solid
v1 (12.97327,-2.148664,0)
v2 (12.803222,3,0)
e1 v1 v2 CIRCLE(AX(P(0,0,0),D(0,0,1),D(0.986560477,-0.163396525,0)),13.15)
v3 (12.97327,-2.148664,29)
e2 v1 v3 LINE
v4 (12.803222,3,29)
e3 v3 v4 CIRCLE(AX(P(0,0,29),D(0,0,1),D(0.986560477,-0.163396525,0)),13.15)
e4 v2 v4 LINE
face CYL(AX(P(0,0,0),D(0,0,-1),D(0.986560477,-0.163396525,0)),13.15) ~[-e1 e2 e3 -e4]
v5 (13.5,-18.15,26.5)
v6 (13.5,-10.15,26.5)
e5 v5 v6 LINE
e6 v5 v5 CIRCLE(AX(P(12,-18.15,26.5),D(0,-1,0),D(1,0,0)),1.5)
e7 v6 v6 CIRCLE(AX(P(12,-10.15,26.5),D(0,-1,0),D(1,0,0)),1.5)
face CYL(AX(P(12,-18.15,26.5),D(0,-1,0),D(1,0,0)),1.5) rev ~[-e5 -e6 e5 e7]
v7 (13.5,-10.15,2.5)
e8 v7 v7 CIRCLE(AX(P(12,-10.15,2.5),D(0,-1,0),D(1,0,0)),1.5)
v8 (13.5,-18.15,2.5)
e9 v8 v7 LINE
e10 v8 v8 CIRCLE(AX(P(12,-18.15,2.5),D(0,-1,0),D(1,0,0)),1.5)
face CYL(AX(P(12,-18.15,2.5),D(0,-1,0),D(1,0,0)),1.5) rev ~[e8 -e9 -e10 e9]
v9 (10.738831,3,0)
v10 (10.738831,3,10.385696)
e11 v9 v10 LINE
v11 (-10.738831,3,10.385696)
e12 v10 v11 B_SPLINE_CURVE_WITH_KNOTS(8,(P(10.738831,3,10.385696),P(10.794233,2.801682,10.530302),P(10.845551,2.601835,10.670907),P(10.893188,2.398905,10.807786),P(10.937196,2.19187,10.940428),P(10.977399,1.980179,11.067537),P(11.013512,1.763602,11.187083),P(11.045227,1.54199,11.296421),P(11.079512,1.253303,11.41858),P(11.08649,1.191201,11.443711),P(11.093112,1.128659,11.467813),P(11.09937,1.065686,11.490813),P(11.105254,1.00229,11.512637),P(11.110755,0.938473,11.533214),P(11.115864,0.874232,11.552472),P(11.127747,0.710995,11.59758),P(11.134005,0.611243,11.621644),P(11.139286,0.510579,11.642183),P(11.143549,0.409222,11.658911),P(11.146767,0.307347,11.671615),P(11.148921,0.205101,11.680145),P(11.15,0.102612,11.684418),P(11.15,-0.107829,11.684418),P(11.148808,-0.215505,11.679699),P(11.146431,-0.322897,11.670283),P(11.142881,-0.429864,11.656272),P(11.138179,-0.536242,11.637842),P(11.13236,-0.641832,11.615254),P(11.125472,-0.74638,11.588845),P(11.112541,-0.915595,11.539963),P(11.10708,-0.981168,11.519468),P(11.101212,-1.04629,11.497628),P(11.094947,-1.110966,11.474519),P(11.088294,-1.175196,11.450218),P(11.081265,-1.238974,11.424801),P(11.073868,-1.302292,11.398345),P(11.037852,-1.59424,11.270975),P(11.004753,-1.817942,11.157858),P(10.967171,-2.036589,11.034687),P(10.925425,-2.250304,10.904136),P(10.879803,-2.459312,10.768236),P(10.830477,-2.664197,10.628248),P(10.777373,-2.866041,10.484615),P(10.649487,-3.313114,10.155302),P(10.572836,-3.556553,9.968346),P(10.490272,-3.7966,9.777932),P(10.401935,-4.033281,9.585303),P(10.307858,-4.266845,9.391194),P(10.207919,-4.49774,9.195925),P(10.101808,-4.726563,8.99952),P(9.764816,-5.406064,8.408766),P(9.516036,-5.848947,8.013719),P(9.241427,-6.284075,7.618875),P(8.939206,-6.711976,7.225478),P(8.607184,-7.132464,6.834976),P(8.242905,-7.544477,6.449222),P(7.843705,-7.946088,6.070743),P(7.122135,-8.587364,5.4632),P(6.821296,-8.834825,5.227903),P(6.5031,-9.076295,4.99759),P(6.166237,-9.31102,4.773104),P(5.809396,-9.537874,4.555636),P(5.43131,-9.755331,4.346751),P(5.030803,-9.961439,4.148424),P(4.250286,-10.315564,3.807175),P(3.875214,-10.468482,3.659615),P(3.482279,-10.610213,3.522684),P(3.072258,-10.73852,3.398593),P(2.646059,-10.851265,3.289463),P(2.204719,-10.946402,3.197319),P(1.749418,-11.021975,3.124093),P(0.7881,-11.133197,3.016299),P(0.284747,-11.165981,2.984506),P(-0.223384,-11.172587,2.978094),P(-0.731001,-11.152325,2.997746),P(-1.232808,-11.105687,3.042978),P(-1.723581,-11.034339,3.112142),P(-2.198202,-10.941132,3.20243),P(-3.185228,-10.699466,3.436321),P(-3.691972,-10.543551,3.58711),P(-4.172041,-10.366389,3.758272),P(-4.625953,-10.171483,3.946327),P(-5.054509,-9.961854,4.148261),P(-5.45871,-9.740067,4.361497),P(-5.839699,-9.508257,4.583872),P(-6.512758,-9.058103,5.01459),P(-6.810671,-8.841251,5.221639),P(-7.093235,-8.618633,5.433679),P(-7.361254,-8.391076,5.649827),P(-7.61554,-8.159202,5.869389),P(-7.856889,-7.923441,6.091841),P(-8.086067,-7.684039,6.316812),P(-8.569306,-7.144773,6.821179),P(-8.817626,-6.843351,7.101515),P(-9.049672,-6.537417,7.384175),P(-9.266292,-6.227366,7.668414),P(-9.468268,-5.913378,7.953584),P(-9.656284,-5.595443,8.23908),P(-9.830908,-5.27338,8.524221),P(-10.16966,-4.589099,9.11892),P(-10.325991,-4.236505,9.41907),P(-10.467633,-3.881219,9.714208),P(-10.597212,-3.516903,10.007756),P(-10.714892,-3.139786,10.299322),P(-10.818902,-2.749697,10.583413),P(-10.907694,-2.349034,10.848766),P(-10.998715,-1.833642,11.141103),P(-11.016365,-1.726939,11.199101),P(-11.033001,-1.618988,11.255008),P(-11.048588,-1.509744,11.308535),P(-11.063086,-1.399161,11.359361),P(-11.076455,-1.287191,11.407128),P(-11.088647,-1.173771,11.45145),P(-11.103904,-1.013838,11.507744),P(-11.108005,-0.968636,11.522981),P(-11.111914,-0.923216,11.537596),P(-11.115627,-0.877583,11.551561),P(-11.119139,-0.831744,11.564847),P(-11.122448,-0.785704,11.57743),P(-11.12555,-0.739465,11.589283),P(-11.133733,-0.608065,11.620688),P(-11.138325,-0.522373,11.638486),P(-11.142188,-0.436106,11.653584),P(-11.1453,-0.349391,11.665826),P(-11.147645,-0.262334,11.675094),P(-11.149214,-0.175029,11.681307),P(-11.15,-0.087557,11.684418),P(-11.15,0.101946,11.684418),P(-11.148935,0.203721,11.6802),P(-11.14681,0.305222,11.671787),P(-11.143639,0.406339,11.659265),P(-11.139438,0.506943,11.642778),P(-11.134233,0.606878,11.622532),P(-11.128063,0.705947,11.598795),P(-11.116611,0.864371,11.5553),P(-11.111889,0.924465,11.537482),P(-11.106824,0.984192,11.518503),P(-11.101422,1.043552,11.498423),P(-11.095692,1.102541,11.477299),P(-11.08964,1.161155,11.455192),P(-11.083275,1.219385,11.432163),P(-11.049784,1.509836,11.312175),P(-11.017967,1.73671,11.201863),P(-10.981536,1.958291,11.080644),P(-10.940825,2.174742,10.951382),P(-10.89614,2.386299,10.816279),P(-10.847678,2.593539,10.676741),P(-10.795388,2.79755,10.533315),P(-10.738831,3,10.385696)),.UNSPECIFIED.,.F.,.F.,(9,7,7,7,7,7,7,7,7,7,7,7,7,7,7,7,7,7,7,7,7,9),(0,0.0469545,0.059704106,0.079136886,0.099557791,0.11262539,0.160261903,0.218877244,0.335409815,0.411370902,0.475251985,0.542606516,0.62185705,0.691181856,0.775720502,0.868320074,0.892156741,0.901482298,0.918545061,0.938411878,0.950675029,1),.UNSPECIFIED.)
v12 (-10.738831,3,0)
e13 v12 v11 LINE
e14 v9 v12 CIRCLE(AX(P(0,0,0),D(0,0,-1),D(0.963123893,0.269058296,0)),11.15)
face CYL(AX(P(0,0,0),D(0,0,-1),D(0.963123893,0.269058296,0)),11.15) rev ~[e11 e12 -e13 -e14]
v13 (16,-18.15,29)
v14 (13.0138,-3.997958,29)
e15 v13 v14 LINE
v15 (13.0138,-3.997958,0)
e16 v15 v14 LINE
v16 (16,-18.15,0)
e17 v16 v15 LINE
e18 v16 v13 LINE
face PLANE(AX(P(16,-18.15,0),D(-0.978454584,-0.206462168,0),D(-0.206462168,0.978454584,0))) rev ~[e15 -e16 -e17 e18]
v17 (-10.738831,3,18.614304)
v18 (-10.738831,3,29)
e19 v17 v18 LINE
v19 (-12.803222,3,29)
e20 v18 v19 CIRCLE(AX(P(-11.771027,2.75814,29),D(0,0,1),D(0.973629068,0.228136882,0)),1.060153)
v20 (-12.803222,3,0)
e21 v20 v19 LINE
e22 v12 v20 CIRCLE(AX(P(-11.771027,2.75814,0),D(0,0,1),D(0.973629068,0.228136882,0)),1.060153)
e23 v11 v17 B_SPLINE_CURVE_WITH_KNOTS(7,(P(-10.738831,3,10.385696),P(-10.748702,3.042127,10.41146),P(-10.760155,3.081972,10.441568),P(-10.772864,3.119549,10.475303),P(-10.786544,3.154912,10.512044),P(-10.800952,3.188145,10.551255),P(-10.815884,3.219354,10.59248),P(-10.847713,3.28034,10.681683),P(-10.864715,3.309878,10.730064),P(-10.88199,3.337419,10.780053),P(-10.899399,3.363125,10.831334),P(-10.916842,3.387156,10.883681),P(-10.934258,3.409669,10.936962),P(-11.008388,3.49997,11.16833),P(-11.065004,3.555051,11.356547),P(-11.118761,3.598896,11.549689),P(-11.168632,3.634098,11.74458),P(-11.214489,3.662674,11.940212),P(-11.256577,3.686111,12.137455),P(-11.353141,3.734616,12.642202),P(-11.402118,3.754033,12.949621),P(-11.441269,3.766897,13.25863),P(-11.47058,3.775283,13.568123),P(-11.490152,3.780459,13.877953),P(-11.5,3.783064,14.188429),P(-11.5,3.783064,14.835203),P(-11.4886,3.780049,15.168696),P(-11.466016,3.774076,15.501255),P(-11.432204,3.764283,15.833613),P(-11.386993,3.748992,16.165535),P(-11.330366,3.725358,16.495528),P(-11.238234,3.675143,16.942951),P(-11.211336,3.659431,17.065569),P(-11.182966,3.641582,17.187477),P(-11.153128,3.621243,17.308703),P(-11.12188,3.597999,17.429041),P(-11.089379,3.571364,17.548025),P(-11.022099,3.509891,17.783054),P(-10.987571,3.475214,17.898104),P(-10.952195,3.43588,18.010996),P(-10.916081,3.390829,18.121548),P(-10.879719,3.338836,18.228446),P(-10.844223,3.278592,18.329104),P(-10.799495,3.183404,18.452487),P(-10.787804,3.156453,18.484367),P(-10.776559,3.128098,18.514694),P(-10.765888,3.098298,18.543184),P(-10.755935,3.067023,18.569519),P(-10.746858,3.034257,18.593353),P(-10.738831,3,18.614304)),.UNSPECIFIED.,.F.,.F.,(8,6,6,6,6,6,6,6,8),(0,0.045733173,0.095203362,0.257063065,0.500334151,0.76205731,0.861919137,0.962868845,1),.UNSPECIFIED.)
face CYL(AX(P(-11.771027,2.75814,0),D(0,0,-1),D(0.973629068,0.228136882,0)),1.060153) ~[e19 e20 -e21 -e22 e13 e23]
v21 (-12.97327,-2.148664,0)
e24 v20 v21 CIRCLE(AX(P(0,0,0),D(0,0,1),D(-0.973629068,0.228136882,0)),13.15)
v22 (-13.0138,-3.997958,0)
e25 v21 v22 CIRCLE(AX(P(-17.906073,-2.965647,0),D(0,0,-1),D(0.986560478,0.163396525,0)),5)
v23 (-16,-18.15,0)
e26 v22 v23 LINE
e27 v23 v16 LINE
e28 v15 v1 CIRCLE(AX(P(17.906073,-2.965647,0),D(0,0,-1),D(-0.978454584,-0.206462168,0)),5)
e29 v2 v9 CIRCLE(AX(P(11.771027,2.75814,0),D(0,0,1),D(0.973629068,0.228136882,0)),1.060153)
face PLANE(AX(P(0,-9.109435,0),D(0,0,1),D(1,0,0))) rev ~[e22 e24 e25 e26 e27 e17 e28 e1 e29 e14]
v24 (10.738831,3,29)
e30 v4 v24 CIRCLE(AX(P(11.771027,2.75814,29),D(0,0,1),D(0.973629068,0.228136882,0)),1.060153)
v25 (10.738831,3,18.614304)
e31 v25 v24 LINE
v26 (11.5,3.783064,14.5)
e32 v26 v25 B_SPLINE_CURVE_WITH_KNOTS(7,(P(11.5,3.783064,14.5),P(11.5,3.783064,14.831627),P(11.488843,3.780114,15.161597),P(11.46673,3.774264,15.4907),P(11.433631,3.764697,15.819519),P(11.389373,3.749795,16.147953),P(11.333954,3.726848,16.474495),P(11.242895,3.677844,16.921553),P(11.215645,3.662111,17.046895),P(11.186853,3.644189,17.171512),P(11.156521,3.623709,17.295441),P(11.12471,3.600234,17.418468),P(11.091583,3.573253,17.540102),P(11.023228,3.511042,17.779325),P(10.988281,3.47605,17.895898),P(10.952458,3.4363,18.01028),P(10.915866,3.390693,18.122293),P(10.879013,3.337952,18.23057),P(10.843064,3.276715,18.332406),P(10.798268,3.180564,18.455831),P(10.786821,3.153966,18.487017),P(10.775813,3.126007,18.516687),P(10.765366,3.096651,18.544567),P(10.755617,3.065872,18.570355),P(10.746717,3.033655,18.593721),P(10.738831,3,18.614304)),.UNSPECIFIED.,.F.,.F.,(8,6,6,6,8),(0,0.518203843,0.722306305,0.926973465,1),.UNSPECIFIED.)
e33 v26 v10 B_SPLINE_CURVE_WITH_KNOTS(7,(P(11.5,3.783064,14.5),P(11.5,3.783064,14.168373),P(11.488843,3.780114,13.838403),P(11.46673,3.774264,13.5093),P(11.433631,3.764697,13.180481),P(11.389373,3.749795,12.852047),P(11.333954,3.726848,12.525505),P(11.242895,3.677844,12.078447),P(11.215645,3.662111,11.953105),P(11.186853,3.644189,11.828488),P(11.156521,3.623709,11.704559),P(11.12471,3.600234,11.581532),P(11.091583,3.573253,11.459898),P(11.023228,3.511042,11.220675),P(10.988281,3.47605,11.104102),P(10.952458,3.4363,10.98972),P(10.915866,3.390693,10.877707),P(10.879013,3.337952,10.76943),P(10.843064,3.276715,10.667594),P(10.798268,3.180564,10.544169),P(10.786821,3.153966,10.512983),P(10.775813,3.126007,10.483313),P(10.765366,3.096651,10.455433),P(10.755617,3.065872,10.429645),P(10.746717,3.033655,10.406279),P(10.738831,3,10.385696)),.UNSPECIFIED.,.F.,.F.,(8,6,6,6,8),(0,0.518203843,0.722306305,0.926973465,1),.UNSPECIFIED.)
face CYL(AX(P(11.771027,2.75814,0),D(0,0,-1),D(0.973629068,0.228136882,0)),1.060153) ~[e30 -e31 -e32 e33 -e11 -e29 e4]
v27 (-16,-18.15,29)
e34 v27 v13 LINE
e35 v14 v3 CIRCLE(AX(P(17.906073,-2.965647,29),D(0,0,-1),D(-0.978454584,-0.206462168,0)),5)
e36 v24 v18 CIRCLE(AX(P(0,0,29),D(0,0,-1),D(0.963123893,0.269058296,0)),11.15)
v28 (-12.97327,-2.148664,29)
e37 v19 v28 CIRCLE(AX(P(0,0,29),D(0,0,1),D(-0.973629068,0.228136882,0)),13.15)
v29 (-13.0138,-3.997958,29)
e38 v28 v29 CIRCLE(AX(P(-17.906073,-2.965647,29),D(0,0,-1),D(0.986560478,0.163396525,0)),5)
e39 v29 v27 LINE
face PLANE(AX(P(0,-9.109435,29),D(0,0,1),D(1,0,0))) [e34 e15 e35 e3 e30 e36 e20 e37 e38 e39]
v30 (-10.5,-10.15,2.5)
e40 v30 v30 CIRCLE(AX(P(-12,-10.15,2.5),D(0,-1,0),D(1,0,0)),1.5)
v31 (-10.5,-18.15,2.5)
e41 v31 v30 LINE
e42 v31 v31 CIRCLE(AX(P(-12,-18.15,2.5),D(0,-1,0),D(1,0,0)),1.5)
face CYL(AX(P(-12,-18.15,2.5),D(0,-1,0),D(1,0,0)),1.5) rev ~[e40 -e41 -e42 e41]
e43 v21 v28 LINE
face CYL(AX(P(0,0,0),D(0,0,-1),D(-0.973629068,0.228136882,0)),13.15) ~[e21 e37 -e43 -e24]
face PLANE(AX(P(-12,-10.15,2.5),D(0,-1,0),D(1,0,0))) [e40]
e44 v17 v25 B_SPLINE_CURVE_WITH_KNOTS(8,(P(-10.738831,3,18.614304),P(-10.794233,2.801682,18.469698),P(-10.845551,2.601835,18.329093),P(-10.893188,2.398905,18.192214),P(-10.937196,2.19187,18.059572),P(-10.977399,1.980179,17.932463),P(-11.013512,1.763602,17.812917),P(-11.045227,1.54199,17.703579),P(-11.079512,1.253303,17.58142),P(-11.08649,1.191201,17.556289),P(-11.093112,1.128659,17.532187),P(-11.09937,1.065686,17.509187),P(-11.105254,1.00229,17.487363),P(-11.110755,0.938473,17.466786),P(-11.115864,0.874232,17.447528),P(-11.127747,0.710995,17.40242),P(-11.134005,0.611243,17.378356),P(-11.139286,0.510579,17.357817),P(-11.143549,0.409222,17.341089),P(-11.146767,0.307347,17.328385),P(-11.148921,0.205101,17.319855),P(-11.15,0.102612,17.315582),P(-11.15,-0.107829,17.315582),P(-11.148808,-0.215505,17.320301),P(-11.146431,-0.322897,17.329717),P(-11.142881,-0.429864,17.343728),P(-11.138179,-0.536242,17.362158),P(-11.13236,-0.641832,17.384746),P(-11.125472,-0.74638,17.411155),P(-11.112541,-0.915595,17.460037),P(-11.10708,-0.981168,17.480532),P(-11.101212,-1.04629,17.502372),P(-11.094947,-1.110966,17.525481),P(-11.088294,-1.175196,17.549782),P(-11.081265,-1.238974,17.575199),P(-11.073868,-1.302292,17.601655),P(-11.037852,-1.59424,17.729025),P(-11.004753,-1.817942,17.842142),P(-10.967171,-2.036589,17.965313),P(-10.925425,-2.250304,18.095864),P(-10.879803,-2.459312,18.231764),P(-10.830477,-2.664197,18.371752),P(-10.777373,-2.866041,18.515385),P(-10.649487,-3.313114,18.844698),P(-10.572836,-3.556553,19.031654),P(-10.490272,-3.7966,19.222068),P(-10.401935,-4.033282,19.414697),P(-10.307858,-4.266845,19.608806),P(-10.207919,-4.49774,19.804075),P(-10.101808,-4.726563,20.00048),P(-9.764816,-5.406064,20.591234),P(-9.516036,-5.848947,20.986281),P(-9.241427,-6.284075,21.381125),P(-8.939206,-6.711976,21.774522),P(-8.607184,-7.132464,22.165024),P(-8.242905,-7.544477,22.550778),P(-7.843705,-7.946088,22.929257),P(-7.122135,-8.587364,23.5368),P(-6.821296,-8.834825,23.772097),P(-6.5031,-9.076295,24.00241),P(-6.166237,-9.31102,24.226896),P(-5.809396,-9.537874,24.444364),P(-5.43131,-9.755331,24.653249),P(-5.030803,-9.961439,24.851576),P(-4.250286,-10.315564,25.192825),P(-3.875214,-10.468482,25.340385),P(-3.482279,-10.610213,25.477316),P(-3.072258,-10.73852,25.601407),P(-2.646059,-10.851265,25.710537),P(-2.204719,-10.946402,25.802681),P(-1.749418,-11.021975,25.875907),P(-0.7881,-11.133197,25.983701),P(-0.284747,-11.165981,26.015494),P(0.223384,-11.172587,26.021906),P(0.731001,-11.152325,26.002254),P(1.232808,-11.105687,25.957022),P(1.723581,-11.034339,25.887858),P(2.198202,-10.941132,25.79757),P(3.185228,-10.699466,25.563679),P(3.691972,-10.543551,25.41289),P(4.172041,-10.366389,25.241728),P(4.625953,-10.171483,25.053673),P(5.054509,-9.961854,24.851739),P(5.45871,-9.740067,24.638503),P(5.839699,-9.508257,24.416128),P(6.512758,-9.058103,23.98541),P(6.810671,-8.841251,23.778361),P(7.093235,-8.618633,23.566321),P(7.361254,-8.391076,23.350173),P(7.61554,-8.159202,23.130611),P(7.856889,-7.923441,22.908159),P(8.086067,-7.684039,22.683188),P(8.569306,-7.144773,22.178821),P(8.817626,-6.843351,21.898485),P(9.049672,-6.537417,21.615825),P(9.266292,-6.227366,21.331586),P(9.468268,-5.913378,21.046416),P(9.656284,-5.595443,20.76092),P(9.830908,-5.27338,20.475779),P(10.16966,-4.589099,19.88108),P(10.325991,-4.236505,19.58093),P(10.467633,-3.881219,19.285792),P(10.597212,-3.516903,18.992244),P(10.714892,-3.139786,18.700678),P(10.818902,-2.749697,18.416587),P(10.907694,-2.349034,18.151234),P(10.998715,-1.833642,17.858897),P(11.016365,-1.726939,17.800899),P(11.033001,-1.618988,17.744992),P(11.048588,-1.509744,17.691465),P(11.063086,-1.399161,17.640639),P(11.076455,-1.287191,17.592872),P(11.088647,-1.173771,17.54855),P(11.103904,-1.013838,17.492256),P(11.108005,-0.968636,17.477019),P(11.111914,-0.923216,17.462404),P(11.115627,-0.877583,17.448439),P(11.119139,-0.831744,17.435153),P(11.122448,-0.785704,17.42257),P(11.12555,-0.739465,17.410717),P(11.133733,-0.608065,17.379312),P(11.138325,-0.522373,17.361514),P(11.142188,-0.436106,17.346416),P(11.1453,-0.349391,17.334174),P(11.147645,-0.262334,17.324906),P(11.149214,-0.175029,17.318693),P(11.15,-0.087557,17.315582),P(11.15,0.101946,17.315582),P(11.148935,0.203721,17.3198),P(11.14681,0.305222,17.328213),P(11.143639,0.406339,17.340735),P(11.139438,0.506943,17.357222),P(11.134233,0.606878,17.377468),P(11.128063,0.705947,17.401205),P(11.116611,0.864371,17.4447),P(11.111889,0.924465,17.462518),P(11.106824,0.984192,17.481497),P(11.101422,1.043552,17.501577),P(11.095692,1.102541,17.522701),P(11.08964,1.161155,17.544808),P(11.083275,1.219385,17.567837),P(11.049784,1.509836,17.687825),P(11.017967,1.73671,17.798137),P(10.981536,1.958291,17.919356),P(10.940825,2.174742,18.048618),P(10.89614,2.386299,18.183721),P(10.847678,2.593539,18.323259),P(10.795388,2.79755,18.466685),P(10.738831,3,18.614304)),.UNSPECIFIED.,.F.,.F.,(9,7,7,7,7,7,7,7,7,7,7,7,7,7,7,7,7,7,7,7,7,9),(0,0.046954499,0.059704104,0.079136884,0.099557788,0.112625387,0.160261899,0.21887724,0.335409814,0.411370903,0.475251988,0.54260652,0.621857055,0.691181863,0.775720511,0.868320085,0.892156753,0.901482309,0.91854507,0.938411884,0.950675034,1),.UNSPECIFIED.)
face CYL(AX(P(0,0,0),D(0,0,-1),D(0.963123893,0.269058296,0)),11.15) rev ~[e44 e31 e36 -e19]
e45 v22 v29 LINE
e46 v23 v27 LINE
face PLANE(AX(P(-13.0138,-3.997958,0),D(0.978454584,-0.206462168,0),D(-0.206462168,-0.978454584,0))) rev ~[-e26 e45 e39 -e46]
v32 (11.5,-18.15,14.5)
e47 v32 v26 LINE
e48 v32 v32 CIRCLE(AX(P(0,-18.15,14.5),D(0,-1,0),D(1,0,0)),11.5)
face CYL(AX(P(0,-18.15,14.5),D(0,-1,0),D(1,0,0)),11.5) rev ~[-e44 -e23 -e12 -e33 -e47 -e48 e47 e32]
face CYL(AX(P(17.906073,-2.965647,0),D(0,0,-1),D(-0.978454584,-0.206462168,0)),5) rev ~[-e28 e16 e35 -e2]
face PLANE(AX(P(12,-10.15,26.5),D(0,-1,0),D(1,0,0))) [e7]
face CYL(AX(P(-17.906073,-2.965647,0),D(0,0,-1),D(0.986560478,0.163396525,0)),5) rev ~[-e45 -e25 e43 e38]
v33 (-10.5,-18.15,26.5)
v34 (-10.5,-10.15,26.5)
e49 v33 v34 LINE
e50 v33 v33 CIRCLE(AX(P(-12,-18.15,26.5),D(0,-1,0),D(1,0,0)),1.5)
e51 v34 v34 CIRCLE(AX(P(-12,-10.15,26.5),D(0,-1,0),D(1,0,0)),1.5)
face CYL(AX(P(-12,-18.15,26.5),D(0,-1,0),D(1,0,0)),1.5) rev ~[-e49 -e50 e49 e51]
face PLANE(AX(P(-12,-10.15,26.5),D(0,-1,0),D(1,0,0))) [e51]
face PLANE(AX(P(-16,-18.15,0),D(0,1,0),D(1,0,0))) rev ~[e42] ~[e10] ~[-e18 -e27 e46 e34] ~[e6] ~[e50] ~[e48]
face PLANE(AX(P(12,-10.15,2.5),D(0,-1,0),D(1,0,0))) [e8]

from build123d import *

# Parameters (mm, degrees)
F1_DEPTH = 29
F2_R     = 11.5
F3_DEPTH = 25
F2_R_2   = 1.5
F4_DEPTH = 8


# Not quite as in the source:
# - a feature names something its author has since deleted; it is built from what else it names


with BuildPart() as f1:
    # F0 (on Top) → F1 (new body)
    with BuildSketch(Plane.XY):
        with BuildLine():
            ThreePointArc((10.7388314076, 3), (0, -11.15), (-10.7388314076, 3))
            ThreePointArc((-10.7388314076, 3), (-11.7710268291, 3.8182927175), (-12.8032222507, 3))
            ThreePointArc((-12.8032222507, 3), (-13.142833705, 0.4340762628), (-12.9732702789, -2.148664299))
            ThreePointArc((-12.9732702789, -2.148664299), (-12.9072730339, -3.0752015435), (-13.0137997447, -3.9979577203))
            Line((-13.0137997447, -3.9979577203), (-16, -18.15))
            Line((-16, -18.15), (0, -18.15))
            Line((0, -18.15), (16, -18.15))
            Line((16, -18.15), (13.0137997447, -3.9979577203))
            ThreePointArc((13.0137997447, -3.9979577203), (12.9072730339, -3.0752015435), (12.9732702789, -2.148664299))
            ThreePointArc((12.9732702789, -2.148664299), (13.142833705, 0.4340762628), (12.8032222507, 3))
            ThreePointArc((12.8032222507, 3), (11.7710268291, 3.8182927175), (10.7388314076, 3))
        make_face()
    extrude(amount=F1_DEPTH)

    # F2 (on face) → F3 (cut)
    with BuildSketch(Plane.XZ.offset(18.15)):
        with Locations((0, 14.5)):
            Circle(F2_R)
    extrude(amount=-F3_DEPTH, mode=Mode.SUBTRACT)

    # F2 (on face) → F4 (cut)
    with BuildSketch(Plane.XZ.offset(18.15)):
        with Locations((-12, 26.5)):
            Circle(F2_R_2)
        with Locations((-12, 2.5)):
            Circle(F2_R_2)
        with Locations((12, 26.5)):
            Circle(F2_R_2)
        with Locations((12, 2.5)):
            Circle(F2_R_2)
    extrude(amount=-F4_DEPTH, mode=Mode.SUBTRACT)


solid = f1.part
